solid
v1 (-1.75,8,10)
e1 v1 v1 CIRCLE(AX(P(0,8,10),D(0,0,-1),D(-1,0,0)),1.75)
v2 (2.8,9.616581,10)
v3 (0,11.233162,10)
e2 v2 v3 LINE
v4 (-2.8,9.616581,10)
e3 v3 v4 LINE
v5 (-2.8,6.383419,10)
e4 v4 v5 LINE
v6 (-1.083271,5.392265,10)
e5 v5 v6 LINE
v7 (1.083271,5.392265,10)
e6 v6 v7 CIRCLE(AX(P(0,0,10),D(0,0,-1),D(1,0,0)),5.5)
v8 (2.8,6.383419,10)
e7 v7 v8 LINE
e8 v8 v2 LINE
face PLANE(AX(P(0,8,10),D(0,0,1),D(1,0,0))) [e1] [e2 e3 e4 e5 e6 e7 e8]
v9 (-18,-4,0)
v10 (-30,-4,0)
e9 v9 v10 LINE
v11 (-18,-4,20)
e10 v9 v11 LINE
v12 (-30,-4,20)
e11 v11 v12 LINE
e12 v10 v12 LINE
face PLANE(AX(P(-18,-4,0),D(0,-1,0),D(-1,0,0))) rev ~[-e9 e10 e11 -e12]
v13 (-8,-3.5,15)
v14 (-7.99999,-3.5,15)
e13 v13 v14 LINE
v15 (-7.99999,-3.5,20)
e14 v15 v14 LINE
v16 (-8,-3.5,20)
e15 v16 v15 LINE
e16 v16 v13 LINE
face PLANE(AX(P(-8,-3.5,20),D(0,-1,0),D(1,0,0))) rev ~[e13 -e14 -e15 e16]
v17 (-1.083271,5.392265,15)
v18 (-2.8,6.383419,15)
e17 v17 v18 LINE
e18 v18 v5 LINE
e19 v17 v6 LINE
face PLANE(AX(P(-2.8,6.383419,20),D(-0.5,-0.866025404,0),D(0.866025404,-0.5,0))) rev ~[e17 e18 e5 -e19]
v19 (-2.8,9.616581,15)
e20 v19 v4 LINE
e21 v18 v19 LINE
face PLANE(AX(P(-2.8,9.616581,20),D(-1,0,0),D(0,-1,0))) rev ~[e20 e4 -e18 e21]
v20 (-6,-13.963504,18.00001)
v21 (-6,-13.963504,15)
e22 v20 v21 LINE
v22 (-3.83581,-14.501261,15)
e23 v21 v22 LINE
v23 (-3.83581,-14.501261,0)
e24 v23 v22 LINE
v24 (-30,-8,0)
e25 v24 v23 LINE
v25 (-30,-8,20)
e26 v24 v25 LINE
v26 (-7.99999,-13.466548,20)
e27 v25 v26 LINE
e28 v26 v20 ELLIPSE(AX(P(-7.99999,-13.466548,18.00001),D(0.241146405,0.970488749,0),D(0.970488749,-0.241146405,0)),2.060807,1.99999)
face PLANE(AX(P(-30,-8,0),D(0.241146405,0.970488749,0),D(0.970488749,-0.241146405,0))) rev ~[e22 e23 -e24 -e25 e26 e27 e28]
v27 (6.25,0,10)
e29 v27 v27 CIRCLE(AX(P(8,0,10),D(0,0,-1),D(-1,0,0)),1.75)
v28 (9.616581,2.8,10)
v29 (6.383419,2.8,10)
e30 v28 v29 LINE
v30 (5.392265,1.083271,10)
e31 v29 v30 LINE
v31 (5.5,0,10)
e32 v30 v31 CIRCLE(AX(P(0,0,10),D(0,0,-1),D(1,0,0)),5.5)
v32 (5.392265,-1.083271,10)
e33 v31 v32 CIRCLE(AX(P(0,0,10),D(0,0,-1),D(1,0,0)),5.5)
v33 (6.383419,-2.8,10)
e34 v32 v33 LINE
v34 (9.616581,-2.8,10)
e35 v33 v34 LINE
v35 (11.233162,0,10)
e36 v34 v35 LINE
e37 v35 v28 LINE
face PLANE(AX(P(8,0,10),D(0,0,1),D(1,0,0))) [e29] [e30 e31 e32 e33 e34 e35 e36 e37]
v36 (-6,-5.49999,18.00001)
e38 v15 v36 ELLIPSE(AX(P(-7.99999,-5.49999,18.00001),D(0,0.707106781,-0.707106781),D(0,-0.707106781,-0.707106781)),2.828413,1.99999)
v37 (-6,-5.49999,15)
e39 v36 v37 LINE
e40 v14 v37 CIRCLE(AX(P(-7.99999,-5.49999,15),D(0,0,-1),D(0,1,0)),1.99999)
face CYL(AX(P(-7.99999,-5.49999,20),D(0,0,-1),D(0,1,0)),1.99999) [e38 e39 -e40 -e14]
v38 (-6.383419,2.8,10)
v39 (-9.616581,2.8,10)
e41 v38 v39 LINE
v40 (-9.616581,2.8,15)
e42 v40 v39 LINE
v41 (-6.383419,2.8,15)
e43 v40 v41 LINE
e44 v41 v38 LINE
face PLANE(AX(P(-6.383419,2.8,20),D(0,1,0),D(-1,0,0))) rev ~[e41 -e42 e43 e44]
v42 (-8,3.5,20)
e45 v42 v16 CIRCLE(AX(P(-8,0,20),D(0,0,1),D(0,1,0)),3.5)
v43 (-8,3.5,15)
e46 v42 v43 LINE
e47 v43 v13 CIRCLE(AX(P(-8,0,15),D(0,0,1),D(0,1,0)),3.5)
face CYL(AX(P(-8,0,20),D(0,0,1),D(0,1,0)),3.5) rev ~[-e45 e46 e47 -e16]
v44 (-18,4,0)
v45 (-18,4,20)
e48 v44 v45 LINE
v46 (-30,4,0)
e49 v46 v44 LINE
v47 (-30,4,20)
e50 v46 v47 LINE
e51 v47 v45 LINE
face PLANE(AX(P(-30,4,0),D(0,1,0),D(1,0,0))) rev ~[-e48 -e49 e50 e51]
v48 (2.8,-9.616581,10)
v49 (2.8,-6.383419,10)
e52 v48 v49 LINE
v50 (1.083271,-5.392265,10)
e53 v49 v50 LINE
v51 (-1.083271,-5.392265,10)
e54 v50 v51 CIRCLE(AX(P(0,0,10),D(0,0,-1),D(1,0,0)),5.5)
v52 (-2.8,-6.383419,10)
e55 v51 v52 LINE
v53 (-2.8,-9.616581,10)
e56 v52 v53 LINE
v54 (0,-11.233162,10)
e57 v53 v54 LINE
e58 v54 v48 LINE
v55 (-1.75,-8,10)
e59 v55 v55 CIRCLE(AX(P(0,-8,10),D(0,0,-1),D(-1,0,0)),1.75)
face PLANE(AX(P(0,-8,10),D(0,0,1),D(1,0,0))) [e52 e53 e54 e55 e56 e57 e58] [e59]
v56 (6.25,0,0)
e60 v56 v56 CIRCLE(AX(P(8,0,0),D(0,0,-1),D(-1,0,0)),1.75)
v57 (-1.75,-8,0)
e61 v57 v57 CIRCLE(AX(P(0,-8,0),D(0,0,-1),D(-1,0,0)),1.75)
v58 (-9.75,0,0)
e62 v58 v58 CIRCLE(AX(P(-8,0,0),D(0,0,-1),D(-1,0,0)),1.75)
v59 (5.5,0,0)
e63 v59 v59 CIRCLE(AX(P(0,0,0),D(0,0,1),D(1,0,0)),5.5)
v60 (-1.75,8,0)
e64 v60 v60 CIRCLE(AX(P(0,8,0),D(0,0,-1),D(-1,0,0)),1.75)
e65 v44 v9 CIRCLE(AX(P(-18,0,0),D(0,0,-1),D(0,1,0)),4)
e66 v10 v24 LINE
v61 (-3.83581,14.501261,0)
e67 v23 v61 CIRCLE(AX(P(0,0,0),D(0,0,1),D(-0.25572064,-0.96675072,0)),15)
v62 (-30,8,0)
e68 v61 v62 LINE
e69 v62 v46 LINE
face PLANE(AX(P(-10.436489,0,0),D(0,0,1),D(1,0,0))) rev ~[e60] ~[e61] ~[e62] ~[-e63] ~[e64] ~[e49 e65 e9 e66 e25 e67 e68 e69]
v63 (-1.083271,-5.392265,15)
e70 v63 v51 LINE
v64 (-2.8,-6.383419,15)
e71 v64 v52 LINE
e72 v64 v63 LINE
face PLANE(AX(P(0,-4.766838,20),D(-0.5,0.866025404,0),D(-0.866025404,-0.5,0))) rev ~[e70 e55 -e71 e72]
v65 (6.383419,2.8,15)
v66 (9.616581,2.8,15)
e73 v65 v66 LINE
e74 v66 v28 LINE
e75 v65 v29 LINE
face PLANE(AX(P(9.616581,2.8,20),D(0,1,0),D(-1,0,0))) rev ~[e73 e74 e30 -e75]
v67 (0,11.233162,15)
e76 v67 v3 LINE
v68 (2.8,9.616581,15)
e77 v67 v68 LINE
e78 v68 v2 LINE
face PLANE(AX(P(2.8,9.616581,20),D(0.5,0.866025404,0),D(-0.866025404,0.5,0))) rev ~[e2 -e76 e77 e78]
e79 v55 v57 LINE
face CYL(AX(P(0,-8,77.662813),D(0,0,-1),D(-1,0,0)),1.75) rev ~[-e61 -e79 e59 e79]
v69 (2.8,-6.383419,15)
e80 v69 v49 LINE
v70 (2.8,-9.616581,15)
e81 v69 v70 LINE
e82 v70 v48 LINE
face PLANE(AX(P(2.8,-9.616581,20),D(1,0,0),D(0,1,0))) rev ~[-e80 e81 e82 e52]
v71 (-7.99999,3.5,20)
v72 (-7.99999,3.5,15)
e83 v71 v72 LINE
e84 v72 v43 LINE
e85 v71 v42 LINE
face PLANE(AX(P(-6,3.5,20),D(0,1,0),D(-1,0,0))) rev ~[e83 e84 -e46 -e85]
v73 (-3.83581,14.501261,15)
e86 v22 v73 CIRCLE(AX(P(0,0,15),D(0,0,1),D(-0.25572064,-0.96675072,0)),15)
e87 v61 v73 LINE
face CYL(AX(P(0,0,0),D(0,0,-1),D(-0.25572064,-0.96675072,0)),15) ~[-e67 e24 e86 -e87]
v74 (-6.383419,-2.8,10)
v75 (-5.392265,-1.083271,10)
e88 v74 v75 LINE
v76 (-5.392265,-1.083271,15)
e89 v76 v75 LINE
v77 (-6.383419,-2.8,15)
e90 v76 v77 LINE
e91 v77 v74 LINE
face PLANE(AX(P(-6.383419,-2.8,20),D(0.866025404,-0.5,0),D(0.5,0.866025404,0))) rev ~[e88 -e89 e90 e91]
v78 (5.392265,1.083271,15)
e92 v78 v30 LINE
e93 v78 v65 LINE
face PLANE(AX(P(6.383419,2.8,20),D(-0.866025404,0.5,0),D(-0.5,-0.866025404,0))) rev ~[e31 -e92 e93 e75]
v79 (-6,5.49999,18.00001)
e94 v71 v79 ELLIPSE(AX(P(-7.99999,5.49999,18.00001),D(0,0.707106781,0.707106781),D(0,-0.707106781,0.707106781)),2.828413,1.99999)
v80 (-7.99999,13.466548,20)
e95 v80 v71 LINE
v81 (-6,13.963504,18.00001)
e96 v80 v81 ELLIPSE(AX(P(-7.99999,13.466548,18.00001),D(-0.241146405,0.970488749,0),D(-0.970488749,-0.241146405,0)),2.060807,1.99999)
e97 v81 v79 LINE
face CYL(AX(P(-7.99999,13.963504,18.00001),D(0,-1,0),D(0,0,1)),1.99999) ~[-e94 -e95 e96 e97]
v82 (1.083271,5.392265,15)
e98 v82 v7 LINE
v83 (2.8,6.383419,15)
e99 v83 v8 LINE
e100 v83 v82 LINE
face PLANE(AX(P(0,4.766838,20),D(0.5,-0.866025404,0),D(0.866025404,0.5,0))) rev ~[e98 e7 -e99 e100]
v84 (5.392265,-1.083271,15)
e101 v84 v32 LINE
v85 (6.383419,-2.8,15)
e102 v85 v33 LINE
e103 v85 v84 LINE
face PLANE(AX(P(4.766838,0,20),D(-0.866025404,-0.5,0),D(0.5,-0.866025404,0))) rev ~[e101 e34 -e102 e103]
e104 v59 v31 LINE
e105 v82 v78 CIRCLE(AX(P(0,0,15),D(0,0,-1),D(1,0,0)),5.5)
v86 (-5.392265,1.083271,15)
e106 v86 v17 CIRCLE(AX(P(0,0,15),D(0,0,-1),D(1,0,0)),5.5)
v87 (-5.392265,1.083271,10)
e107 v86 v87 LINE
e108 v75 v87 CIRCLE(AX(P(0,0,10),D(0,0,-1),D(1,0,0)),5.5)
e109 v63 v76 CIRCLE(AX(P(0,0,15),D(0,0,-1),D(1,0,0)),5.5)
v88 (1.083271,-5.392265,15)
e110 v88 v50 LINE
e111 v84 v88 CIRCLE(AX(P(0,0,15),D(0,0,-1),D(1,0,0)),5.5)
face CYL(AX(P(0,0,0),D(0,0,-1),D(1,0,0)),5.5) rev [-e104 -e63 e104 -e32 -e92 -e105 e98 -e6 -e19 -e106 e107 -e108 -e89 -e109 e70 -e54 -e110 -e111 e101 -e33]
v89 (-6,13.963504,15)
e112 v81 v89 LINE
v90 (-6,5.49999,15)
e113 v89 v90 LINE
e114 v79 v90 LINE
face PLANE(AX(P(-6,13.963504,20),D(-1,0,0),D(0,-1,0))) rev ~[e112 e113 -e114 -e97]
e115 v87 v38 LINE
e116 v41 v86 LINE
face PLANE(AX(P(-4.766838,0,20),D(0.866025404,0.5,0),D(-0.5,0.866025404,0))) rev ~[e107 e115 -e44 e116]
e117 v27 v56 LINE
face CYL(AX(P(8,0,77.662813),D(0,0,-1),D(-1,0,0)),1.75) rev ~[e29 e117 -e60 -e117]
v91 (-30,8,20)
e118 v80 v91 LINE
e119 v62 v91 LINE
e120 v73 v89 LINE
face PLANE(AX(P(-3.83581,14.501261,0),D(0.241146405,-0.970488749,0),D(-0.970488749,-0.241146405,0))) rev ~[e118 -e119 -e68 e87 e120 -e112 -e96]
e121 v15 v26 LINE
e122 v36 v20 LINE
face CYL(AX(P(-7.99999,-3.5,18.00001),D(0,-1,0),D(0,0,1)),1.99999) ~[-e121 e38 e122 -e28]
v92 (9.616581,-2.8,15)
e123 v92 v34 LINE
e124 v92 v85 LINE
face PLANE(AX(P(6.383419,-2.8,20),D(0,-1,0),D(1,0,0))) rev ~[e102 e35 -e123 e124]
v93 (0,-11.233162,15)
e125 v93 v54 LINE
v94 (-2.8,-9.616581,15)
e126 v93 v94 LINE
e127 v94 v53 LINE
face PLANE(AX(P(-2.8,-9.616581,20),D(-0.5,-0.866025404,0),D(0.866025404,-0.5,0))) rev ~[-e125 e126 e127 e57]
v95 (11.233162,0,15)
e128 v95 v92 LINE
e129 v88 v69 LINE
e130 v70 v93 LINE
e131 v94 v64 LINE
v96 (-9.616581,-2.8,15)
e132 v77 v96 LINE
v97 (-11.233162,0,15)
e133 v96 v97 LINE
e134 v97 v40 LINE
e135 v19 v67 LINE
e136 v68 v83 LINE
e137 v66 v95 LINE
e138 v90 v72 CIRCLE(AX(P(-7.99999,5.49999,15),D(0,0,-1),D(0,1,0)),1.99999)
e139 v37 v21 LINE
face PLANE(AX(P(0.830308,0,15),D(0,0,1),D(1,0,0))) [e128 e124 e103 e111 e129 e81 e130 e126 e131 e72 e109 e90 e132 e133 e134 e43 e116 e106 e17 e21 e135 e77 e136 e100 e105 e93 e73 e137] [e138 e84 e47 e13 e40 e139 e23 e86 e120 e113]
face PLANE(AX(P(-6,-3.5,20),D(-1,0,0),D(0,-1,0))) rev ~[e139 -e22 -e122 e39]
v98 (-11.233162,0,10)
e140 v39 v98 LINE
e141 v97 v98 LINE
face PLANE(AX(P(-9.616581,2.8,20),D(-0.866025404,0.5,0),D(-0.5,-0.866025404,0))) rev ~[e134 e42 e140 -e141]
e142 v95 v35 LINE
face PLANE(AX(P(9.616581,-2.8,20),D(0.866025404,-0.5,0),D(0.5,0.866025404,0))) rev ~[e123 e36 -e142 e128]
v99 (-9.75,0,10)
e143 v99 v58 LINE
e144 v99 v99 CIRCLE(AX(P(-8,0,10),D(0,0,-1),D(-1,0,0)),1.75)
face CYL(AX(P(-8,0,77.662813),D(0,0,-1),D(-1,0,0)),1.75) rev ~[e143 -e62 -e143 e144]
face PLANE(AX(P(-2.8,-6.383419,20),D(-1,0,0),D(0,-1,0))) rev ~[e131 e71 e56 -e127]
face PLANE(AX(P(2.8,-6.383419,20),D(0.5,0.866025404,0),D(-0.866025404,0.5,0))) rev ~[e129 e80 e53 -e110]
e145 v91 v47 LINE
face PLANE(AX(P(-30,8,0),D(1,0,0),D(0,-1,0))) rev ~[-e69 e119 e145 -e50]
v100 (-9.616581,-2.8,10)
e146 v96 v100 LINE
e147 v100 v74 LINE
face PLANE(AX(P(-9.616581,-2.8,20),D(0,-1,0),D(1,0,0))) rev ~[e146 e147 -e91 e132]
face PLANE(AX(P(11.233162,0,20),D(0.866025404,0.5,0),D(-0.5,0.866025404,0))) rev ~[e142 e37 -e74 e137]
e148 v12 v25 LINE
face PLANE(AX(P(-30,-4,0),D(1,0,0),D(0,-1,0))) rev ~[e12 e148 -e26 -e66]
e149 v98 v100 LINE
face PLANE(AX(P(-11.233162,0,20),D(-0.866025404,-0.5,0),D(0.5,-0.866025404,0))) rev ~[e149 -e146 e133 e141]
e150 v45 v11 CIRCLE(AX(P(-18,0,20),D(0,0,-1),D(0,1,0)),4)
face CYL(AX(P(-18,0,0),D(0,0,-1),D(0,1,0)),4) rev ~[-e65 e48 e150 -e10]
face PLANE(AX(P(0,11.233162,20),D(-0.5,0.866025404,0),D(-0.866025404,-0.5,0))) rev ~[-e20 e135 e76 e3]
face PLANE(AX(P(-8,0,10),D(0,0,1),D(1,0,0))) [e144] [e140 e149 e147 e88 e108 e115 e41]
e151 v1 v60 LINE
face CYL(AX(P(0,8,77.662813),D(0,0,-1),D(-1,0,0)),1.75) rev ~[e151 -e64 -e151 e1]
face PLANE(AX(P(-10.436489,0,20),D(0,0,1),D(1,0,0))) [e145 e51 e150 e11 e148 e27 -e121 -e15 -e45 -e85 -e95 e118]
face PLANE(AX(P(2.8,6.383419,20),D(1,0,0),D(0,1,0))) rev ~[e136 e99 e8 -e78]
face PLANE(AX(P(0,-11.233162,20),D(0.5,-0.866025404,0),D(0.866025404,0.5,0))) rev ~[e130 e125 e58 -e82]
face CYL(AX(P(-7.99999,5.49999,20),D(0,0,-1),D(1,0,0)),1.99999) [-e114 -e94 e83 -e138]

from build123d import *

# Parameters (mm, degrees)
F0_R     = 5.5
F1_DEPTH = 20
F3_D     = 3.5
F5_DEPTH = 10
F7_DEPTH = 5
F8_R     = 1.99999


# Not quite as in the source:
# - a fillet or chamfer is up to 0.001 mm smaller than in the source, because OpenCascade refuses the exact size


with BuildPart() as f1:
    # F0 (on Top) → F1 (new body)
    with BuildSketch(Plane.XY):
        with BuildLine():
            ThreePointArc((-18, 4), (-14, 0), (-18, -4))
            Line((-18, -4), (-30, -4))
            Line((-30, -4), (-30, -8))
            Line((-30, -8), (-3.8358095935, -14.5012607991))
            ThreePointArc((-3.8358095935, -14.5012607991), (15, 0), (-3.8358095935, 14.5012607991))
            Line((-3.8358095935, 14.5012607991), (-30, 8))
            Line((-30, 8), (-30, 4))
            Line((-30, 4), (-18, 4))
        make_face()
        Circle(F0_R, mode=Mode.SUBTRACT)
    extrude(amount=F1_DEPTH)

    # F3 (through all)
    with Locations(Plane.XY.offset(20)):
        with Locations((8, 0), (0, -8), (-8, 0), (0, 8)):
            Hole(F3_D / 2)

    # F4 (on face) → F5 (cut)
    with BuildSketch(Plane.XY.offset(20)):
        Polygon((11.2331615075, 0), (9.6165807537, 2.8), (6.3834192463, 2.8), (4.7668384925, 0), (6.3834192463, -2.8), (9.6165807537, -2.8), align=None)
        Polygon((-2.8, 9.6165807537), (-2.8, 6.3834192463), (0, 4.7668384925), (2.8, 6.3834192463), (2.8, 9.6165807537), (0, 11.2331615075), align=None)
        Polygon((-9.6165807537, -2.8), (-6.3834192463, -2.8), (-4.7668384925, 0), (-6.3834192463, 2.8), (-9.6165807537, 2.8), (-11.2331615075, 0), align=None)
        Polygon((2.8, -9.6165807537), (2.8, -6.3834192463), (0, -4.7668384925), (-2.8, -6.3834192463), (-2.8, -9.6165807537), (0, -11.2331615075), align=None)
    extrude(amount=-F5_DEPTH, mode=Mode.SUBTRACT)

    # F6 (on face) → F7 (cut)
    with BuildSketch(Plane.XY.offset(20)):
        with BuildLine():
            Line((-6, -13.9635041923), (-3.8358095935, -14.5012607991))
            ThreePointArc((-3.8358095935, -14.5012607991), (15, 0), (-3.8358095935, 14.5012607991))
            Line((-3.8358095935, 14.5012607991), (-6, 13.9635041923))
            Line((-6, 13.9635041923), (-6, 3.5))
            Line((-6, 3.5), (-8, 3.5))
            ThreePointArc((-8, 3.5), (-11.5, 0), (-8, -3.5))
            Line((-8, -3.5), (-6, -3.5))
            Line((-6, -3.5), (-6, -13.9635041923))
        make_face()
    extrude(amount=-F7_DEPTH, mode=Mode.SUBTRACT)

    # F8 (radius 2 in the source; OpenCascade refuses exactly that, so slightly less here)
    f8_edges = [f1.edges().sort_by_distance(p)[0] for p in [
        (-6, -8.731752, 20),
        (-6, 8.731752, 20),
        (-6, -3.5, 17.5),
        (-6, 3.5, 17.5),
    ]]
    fillet(f8_edges, radius=F8_R)


solid = f1.part
